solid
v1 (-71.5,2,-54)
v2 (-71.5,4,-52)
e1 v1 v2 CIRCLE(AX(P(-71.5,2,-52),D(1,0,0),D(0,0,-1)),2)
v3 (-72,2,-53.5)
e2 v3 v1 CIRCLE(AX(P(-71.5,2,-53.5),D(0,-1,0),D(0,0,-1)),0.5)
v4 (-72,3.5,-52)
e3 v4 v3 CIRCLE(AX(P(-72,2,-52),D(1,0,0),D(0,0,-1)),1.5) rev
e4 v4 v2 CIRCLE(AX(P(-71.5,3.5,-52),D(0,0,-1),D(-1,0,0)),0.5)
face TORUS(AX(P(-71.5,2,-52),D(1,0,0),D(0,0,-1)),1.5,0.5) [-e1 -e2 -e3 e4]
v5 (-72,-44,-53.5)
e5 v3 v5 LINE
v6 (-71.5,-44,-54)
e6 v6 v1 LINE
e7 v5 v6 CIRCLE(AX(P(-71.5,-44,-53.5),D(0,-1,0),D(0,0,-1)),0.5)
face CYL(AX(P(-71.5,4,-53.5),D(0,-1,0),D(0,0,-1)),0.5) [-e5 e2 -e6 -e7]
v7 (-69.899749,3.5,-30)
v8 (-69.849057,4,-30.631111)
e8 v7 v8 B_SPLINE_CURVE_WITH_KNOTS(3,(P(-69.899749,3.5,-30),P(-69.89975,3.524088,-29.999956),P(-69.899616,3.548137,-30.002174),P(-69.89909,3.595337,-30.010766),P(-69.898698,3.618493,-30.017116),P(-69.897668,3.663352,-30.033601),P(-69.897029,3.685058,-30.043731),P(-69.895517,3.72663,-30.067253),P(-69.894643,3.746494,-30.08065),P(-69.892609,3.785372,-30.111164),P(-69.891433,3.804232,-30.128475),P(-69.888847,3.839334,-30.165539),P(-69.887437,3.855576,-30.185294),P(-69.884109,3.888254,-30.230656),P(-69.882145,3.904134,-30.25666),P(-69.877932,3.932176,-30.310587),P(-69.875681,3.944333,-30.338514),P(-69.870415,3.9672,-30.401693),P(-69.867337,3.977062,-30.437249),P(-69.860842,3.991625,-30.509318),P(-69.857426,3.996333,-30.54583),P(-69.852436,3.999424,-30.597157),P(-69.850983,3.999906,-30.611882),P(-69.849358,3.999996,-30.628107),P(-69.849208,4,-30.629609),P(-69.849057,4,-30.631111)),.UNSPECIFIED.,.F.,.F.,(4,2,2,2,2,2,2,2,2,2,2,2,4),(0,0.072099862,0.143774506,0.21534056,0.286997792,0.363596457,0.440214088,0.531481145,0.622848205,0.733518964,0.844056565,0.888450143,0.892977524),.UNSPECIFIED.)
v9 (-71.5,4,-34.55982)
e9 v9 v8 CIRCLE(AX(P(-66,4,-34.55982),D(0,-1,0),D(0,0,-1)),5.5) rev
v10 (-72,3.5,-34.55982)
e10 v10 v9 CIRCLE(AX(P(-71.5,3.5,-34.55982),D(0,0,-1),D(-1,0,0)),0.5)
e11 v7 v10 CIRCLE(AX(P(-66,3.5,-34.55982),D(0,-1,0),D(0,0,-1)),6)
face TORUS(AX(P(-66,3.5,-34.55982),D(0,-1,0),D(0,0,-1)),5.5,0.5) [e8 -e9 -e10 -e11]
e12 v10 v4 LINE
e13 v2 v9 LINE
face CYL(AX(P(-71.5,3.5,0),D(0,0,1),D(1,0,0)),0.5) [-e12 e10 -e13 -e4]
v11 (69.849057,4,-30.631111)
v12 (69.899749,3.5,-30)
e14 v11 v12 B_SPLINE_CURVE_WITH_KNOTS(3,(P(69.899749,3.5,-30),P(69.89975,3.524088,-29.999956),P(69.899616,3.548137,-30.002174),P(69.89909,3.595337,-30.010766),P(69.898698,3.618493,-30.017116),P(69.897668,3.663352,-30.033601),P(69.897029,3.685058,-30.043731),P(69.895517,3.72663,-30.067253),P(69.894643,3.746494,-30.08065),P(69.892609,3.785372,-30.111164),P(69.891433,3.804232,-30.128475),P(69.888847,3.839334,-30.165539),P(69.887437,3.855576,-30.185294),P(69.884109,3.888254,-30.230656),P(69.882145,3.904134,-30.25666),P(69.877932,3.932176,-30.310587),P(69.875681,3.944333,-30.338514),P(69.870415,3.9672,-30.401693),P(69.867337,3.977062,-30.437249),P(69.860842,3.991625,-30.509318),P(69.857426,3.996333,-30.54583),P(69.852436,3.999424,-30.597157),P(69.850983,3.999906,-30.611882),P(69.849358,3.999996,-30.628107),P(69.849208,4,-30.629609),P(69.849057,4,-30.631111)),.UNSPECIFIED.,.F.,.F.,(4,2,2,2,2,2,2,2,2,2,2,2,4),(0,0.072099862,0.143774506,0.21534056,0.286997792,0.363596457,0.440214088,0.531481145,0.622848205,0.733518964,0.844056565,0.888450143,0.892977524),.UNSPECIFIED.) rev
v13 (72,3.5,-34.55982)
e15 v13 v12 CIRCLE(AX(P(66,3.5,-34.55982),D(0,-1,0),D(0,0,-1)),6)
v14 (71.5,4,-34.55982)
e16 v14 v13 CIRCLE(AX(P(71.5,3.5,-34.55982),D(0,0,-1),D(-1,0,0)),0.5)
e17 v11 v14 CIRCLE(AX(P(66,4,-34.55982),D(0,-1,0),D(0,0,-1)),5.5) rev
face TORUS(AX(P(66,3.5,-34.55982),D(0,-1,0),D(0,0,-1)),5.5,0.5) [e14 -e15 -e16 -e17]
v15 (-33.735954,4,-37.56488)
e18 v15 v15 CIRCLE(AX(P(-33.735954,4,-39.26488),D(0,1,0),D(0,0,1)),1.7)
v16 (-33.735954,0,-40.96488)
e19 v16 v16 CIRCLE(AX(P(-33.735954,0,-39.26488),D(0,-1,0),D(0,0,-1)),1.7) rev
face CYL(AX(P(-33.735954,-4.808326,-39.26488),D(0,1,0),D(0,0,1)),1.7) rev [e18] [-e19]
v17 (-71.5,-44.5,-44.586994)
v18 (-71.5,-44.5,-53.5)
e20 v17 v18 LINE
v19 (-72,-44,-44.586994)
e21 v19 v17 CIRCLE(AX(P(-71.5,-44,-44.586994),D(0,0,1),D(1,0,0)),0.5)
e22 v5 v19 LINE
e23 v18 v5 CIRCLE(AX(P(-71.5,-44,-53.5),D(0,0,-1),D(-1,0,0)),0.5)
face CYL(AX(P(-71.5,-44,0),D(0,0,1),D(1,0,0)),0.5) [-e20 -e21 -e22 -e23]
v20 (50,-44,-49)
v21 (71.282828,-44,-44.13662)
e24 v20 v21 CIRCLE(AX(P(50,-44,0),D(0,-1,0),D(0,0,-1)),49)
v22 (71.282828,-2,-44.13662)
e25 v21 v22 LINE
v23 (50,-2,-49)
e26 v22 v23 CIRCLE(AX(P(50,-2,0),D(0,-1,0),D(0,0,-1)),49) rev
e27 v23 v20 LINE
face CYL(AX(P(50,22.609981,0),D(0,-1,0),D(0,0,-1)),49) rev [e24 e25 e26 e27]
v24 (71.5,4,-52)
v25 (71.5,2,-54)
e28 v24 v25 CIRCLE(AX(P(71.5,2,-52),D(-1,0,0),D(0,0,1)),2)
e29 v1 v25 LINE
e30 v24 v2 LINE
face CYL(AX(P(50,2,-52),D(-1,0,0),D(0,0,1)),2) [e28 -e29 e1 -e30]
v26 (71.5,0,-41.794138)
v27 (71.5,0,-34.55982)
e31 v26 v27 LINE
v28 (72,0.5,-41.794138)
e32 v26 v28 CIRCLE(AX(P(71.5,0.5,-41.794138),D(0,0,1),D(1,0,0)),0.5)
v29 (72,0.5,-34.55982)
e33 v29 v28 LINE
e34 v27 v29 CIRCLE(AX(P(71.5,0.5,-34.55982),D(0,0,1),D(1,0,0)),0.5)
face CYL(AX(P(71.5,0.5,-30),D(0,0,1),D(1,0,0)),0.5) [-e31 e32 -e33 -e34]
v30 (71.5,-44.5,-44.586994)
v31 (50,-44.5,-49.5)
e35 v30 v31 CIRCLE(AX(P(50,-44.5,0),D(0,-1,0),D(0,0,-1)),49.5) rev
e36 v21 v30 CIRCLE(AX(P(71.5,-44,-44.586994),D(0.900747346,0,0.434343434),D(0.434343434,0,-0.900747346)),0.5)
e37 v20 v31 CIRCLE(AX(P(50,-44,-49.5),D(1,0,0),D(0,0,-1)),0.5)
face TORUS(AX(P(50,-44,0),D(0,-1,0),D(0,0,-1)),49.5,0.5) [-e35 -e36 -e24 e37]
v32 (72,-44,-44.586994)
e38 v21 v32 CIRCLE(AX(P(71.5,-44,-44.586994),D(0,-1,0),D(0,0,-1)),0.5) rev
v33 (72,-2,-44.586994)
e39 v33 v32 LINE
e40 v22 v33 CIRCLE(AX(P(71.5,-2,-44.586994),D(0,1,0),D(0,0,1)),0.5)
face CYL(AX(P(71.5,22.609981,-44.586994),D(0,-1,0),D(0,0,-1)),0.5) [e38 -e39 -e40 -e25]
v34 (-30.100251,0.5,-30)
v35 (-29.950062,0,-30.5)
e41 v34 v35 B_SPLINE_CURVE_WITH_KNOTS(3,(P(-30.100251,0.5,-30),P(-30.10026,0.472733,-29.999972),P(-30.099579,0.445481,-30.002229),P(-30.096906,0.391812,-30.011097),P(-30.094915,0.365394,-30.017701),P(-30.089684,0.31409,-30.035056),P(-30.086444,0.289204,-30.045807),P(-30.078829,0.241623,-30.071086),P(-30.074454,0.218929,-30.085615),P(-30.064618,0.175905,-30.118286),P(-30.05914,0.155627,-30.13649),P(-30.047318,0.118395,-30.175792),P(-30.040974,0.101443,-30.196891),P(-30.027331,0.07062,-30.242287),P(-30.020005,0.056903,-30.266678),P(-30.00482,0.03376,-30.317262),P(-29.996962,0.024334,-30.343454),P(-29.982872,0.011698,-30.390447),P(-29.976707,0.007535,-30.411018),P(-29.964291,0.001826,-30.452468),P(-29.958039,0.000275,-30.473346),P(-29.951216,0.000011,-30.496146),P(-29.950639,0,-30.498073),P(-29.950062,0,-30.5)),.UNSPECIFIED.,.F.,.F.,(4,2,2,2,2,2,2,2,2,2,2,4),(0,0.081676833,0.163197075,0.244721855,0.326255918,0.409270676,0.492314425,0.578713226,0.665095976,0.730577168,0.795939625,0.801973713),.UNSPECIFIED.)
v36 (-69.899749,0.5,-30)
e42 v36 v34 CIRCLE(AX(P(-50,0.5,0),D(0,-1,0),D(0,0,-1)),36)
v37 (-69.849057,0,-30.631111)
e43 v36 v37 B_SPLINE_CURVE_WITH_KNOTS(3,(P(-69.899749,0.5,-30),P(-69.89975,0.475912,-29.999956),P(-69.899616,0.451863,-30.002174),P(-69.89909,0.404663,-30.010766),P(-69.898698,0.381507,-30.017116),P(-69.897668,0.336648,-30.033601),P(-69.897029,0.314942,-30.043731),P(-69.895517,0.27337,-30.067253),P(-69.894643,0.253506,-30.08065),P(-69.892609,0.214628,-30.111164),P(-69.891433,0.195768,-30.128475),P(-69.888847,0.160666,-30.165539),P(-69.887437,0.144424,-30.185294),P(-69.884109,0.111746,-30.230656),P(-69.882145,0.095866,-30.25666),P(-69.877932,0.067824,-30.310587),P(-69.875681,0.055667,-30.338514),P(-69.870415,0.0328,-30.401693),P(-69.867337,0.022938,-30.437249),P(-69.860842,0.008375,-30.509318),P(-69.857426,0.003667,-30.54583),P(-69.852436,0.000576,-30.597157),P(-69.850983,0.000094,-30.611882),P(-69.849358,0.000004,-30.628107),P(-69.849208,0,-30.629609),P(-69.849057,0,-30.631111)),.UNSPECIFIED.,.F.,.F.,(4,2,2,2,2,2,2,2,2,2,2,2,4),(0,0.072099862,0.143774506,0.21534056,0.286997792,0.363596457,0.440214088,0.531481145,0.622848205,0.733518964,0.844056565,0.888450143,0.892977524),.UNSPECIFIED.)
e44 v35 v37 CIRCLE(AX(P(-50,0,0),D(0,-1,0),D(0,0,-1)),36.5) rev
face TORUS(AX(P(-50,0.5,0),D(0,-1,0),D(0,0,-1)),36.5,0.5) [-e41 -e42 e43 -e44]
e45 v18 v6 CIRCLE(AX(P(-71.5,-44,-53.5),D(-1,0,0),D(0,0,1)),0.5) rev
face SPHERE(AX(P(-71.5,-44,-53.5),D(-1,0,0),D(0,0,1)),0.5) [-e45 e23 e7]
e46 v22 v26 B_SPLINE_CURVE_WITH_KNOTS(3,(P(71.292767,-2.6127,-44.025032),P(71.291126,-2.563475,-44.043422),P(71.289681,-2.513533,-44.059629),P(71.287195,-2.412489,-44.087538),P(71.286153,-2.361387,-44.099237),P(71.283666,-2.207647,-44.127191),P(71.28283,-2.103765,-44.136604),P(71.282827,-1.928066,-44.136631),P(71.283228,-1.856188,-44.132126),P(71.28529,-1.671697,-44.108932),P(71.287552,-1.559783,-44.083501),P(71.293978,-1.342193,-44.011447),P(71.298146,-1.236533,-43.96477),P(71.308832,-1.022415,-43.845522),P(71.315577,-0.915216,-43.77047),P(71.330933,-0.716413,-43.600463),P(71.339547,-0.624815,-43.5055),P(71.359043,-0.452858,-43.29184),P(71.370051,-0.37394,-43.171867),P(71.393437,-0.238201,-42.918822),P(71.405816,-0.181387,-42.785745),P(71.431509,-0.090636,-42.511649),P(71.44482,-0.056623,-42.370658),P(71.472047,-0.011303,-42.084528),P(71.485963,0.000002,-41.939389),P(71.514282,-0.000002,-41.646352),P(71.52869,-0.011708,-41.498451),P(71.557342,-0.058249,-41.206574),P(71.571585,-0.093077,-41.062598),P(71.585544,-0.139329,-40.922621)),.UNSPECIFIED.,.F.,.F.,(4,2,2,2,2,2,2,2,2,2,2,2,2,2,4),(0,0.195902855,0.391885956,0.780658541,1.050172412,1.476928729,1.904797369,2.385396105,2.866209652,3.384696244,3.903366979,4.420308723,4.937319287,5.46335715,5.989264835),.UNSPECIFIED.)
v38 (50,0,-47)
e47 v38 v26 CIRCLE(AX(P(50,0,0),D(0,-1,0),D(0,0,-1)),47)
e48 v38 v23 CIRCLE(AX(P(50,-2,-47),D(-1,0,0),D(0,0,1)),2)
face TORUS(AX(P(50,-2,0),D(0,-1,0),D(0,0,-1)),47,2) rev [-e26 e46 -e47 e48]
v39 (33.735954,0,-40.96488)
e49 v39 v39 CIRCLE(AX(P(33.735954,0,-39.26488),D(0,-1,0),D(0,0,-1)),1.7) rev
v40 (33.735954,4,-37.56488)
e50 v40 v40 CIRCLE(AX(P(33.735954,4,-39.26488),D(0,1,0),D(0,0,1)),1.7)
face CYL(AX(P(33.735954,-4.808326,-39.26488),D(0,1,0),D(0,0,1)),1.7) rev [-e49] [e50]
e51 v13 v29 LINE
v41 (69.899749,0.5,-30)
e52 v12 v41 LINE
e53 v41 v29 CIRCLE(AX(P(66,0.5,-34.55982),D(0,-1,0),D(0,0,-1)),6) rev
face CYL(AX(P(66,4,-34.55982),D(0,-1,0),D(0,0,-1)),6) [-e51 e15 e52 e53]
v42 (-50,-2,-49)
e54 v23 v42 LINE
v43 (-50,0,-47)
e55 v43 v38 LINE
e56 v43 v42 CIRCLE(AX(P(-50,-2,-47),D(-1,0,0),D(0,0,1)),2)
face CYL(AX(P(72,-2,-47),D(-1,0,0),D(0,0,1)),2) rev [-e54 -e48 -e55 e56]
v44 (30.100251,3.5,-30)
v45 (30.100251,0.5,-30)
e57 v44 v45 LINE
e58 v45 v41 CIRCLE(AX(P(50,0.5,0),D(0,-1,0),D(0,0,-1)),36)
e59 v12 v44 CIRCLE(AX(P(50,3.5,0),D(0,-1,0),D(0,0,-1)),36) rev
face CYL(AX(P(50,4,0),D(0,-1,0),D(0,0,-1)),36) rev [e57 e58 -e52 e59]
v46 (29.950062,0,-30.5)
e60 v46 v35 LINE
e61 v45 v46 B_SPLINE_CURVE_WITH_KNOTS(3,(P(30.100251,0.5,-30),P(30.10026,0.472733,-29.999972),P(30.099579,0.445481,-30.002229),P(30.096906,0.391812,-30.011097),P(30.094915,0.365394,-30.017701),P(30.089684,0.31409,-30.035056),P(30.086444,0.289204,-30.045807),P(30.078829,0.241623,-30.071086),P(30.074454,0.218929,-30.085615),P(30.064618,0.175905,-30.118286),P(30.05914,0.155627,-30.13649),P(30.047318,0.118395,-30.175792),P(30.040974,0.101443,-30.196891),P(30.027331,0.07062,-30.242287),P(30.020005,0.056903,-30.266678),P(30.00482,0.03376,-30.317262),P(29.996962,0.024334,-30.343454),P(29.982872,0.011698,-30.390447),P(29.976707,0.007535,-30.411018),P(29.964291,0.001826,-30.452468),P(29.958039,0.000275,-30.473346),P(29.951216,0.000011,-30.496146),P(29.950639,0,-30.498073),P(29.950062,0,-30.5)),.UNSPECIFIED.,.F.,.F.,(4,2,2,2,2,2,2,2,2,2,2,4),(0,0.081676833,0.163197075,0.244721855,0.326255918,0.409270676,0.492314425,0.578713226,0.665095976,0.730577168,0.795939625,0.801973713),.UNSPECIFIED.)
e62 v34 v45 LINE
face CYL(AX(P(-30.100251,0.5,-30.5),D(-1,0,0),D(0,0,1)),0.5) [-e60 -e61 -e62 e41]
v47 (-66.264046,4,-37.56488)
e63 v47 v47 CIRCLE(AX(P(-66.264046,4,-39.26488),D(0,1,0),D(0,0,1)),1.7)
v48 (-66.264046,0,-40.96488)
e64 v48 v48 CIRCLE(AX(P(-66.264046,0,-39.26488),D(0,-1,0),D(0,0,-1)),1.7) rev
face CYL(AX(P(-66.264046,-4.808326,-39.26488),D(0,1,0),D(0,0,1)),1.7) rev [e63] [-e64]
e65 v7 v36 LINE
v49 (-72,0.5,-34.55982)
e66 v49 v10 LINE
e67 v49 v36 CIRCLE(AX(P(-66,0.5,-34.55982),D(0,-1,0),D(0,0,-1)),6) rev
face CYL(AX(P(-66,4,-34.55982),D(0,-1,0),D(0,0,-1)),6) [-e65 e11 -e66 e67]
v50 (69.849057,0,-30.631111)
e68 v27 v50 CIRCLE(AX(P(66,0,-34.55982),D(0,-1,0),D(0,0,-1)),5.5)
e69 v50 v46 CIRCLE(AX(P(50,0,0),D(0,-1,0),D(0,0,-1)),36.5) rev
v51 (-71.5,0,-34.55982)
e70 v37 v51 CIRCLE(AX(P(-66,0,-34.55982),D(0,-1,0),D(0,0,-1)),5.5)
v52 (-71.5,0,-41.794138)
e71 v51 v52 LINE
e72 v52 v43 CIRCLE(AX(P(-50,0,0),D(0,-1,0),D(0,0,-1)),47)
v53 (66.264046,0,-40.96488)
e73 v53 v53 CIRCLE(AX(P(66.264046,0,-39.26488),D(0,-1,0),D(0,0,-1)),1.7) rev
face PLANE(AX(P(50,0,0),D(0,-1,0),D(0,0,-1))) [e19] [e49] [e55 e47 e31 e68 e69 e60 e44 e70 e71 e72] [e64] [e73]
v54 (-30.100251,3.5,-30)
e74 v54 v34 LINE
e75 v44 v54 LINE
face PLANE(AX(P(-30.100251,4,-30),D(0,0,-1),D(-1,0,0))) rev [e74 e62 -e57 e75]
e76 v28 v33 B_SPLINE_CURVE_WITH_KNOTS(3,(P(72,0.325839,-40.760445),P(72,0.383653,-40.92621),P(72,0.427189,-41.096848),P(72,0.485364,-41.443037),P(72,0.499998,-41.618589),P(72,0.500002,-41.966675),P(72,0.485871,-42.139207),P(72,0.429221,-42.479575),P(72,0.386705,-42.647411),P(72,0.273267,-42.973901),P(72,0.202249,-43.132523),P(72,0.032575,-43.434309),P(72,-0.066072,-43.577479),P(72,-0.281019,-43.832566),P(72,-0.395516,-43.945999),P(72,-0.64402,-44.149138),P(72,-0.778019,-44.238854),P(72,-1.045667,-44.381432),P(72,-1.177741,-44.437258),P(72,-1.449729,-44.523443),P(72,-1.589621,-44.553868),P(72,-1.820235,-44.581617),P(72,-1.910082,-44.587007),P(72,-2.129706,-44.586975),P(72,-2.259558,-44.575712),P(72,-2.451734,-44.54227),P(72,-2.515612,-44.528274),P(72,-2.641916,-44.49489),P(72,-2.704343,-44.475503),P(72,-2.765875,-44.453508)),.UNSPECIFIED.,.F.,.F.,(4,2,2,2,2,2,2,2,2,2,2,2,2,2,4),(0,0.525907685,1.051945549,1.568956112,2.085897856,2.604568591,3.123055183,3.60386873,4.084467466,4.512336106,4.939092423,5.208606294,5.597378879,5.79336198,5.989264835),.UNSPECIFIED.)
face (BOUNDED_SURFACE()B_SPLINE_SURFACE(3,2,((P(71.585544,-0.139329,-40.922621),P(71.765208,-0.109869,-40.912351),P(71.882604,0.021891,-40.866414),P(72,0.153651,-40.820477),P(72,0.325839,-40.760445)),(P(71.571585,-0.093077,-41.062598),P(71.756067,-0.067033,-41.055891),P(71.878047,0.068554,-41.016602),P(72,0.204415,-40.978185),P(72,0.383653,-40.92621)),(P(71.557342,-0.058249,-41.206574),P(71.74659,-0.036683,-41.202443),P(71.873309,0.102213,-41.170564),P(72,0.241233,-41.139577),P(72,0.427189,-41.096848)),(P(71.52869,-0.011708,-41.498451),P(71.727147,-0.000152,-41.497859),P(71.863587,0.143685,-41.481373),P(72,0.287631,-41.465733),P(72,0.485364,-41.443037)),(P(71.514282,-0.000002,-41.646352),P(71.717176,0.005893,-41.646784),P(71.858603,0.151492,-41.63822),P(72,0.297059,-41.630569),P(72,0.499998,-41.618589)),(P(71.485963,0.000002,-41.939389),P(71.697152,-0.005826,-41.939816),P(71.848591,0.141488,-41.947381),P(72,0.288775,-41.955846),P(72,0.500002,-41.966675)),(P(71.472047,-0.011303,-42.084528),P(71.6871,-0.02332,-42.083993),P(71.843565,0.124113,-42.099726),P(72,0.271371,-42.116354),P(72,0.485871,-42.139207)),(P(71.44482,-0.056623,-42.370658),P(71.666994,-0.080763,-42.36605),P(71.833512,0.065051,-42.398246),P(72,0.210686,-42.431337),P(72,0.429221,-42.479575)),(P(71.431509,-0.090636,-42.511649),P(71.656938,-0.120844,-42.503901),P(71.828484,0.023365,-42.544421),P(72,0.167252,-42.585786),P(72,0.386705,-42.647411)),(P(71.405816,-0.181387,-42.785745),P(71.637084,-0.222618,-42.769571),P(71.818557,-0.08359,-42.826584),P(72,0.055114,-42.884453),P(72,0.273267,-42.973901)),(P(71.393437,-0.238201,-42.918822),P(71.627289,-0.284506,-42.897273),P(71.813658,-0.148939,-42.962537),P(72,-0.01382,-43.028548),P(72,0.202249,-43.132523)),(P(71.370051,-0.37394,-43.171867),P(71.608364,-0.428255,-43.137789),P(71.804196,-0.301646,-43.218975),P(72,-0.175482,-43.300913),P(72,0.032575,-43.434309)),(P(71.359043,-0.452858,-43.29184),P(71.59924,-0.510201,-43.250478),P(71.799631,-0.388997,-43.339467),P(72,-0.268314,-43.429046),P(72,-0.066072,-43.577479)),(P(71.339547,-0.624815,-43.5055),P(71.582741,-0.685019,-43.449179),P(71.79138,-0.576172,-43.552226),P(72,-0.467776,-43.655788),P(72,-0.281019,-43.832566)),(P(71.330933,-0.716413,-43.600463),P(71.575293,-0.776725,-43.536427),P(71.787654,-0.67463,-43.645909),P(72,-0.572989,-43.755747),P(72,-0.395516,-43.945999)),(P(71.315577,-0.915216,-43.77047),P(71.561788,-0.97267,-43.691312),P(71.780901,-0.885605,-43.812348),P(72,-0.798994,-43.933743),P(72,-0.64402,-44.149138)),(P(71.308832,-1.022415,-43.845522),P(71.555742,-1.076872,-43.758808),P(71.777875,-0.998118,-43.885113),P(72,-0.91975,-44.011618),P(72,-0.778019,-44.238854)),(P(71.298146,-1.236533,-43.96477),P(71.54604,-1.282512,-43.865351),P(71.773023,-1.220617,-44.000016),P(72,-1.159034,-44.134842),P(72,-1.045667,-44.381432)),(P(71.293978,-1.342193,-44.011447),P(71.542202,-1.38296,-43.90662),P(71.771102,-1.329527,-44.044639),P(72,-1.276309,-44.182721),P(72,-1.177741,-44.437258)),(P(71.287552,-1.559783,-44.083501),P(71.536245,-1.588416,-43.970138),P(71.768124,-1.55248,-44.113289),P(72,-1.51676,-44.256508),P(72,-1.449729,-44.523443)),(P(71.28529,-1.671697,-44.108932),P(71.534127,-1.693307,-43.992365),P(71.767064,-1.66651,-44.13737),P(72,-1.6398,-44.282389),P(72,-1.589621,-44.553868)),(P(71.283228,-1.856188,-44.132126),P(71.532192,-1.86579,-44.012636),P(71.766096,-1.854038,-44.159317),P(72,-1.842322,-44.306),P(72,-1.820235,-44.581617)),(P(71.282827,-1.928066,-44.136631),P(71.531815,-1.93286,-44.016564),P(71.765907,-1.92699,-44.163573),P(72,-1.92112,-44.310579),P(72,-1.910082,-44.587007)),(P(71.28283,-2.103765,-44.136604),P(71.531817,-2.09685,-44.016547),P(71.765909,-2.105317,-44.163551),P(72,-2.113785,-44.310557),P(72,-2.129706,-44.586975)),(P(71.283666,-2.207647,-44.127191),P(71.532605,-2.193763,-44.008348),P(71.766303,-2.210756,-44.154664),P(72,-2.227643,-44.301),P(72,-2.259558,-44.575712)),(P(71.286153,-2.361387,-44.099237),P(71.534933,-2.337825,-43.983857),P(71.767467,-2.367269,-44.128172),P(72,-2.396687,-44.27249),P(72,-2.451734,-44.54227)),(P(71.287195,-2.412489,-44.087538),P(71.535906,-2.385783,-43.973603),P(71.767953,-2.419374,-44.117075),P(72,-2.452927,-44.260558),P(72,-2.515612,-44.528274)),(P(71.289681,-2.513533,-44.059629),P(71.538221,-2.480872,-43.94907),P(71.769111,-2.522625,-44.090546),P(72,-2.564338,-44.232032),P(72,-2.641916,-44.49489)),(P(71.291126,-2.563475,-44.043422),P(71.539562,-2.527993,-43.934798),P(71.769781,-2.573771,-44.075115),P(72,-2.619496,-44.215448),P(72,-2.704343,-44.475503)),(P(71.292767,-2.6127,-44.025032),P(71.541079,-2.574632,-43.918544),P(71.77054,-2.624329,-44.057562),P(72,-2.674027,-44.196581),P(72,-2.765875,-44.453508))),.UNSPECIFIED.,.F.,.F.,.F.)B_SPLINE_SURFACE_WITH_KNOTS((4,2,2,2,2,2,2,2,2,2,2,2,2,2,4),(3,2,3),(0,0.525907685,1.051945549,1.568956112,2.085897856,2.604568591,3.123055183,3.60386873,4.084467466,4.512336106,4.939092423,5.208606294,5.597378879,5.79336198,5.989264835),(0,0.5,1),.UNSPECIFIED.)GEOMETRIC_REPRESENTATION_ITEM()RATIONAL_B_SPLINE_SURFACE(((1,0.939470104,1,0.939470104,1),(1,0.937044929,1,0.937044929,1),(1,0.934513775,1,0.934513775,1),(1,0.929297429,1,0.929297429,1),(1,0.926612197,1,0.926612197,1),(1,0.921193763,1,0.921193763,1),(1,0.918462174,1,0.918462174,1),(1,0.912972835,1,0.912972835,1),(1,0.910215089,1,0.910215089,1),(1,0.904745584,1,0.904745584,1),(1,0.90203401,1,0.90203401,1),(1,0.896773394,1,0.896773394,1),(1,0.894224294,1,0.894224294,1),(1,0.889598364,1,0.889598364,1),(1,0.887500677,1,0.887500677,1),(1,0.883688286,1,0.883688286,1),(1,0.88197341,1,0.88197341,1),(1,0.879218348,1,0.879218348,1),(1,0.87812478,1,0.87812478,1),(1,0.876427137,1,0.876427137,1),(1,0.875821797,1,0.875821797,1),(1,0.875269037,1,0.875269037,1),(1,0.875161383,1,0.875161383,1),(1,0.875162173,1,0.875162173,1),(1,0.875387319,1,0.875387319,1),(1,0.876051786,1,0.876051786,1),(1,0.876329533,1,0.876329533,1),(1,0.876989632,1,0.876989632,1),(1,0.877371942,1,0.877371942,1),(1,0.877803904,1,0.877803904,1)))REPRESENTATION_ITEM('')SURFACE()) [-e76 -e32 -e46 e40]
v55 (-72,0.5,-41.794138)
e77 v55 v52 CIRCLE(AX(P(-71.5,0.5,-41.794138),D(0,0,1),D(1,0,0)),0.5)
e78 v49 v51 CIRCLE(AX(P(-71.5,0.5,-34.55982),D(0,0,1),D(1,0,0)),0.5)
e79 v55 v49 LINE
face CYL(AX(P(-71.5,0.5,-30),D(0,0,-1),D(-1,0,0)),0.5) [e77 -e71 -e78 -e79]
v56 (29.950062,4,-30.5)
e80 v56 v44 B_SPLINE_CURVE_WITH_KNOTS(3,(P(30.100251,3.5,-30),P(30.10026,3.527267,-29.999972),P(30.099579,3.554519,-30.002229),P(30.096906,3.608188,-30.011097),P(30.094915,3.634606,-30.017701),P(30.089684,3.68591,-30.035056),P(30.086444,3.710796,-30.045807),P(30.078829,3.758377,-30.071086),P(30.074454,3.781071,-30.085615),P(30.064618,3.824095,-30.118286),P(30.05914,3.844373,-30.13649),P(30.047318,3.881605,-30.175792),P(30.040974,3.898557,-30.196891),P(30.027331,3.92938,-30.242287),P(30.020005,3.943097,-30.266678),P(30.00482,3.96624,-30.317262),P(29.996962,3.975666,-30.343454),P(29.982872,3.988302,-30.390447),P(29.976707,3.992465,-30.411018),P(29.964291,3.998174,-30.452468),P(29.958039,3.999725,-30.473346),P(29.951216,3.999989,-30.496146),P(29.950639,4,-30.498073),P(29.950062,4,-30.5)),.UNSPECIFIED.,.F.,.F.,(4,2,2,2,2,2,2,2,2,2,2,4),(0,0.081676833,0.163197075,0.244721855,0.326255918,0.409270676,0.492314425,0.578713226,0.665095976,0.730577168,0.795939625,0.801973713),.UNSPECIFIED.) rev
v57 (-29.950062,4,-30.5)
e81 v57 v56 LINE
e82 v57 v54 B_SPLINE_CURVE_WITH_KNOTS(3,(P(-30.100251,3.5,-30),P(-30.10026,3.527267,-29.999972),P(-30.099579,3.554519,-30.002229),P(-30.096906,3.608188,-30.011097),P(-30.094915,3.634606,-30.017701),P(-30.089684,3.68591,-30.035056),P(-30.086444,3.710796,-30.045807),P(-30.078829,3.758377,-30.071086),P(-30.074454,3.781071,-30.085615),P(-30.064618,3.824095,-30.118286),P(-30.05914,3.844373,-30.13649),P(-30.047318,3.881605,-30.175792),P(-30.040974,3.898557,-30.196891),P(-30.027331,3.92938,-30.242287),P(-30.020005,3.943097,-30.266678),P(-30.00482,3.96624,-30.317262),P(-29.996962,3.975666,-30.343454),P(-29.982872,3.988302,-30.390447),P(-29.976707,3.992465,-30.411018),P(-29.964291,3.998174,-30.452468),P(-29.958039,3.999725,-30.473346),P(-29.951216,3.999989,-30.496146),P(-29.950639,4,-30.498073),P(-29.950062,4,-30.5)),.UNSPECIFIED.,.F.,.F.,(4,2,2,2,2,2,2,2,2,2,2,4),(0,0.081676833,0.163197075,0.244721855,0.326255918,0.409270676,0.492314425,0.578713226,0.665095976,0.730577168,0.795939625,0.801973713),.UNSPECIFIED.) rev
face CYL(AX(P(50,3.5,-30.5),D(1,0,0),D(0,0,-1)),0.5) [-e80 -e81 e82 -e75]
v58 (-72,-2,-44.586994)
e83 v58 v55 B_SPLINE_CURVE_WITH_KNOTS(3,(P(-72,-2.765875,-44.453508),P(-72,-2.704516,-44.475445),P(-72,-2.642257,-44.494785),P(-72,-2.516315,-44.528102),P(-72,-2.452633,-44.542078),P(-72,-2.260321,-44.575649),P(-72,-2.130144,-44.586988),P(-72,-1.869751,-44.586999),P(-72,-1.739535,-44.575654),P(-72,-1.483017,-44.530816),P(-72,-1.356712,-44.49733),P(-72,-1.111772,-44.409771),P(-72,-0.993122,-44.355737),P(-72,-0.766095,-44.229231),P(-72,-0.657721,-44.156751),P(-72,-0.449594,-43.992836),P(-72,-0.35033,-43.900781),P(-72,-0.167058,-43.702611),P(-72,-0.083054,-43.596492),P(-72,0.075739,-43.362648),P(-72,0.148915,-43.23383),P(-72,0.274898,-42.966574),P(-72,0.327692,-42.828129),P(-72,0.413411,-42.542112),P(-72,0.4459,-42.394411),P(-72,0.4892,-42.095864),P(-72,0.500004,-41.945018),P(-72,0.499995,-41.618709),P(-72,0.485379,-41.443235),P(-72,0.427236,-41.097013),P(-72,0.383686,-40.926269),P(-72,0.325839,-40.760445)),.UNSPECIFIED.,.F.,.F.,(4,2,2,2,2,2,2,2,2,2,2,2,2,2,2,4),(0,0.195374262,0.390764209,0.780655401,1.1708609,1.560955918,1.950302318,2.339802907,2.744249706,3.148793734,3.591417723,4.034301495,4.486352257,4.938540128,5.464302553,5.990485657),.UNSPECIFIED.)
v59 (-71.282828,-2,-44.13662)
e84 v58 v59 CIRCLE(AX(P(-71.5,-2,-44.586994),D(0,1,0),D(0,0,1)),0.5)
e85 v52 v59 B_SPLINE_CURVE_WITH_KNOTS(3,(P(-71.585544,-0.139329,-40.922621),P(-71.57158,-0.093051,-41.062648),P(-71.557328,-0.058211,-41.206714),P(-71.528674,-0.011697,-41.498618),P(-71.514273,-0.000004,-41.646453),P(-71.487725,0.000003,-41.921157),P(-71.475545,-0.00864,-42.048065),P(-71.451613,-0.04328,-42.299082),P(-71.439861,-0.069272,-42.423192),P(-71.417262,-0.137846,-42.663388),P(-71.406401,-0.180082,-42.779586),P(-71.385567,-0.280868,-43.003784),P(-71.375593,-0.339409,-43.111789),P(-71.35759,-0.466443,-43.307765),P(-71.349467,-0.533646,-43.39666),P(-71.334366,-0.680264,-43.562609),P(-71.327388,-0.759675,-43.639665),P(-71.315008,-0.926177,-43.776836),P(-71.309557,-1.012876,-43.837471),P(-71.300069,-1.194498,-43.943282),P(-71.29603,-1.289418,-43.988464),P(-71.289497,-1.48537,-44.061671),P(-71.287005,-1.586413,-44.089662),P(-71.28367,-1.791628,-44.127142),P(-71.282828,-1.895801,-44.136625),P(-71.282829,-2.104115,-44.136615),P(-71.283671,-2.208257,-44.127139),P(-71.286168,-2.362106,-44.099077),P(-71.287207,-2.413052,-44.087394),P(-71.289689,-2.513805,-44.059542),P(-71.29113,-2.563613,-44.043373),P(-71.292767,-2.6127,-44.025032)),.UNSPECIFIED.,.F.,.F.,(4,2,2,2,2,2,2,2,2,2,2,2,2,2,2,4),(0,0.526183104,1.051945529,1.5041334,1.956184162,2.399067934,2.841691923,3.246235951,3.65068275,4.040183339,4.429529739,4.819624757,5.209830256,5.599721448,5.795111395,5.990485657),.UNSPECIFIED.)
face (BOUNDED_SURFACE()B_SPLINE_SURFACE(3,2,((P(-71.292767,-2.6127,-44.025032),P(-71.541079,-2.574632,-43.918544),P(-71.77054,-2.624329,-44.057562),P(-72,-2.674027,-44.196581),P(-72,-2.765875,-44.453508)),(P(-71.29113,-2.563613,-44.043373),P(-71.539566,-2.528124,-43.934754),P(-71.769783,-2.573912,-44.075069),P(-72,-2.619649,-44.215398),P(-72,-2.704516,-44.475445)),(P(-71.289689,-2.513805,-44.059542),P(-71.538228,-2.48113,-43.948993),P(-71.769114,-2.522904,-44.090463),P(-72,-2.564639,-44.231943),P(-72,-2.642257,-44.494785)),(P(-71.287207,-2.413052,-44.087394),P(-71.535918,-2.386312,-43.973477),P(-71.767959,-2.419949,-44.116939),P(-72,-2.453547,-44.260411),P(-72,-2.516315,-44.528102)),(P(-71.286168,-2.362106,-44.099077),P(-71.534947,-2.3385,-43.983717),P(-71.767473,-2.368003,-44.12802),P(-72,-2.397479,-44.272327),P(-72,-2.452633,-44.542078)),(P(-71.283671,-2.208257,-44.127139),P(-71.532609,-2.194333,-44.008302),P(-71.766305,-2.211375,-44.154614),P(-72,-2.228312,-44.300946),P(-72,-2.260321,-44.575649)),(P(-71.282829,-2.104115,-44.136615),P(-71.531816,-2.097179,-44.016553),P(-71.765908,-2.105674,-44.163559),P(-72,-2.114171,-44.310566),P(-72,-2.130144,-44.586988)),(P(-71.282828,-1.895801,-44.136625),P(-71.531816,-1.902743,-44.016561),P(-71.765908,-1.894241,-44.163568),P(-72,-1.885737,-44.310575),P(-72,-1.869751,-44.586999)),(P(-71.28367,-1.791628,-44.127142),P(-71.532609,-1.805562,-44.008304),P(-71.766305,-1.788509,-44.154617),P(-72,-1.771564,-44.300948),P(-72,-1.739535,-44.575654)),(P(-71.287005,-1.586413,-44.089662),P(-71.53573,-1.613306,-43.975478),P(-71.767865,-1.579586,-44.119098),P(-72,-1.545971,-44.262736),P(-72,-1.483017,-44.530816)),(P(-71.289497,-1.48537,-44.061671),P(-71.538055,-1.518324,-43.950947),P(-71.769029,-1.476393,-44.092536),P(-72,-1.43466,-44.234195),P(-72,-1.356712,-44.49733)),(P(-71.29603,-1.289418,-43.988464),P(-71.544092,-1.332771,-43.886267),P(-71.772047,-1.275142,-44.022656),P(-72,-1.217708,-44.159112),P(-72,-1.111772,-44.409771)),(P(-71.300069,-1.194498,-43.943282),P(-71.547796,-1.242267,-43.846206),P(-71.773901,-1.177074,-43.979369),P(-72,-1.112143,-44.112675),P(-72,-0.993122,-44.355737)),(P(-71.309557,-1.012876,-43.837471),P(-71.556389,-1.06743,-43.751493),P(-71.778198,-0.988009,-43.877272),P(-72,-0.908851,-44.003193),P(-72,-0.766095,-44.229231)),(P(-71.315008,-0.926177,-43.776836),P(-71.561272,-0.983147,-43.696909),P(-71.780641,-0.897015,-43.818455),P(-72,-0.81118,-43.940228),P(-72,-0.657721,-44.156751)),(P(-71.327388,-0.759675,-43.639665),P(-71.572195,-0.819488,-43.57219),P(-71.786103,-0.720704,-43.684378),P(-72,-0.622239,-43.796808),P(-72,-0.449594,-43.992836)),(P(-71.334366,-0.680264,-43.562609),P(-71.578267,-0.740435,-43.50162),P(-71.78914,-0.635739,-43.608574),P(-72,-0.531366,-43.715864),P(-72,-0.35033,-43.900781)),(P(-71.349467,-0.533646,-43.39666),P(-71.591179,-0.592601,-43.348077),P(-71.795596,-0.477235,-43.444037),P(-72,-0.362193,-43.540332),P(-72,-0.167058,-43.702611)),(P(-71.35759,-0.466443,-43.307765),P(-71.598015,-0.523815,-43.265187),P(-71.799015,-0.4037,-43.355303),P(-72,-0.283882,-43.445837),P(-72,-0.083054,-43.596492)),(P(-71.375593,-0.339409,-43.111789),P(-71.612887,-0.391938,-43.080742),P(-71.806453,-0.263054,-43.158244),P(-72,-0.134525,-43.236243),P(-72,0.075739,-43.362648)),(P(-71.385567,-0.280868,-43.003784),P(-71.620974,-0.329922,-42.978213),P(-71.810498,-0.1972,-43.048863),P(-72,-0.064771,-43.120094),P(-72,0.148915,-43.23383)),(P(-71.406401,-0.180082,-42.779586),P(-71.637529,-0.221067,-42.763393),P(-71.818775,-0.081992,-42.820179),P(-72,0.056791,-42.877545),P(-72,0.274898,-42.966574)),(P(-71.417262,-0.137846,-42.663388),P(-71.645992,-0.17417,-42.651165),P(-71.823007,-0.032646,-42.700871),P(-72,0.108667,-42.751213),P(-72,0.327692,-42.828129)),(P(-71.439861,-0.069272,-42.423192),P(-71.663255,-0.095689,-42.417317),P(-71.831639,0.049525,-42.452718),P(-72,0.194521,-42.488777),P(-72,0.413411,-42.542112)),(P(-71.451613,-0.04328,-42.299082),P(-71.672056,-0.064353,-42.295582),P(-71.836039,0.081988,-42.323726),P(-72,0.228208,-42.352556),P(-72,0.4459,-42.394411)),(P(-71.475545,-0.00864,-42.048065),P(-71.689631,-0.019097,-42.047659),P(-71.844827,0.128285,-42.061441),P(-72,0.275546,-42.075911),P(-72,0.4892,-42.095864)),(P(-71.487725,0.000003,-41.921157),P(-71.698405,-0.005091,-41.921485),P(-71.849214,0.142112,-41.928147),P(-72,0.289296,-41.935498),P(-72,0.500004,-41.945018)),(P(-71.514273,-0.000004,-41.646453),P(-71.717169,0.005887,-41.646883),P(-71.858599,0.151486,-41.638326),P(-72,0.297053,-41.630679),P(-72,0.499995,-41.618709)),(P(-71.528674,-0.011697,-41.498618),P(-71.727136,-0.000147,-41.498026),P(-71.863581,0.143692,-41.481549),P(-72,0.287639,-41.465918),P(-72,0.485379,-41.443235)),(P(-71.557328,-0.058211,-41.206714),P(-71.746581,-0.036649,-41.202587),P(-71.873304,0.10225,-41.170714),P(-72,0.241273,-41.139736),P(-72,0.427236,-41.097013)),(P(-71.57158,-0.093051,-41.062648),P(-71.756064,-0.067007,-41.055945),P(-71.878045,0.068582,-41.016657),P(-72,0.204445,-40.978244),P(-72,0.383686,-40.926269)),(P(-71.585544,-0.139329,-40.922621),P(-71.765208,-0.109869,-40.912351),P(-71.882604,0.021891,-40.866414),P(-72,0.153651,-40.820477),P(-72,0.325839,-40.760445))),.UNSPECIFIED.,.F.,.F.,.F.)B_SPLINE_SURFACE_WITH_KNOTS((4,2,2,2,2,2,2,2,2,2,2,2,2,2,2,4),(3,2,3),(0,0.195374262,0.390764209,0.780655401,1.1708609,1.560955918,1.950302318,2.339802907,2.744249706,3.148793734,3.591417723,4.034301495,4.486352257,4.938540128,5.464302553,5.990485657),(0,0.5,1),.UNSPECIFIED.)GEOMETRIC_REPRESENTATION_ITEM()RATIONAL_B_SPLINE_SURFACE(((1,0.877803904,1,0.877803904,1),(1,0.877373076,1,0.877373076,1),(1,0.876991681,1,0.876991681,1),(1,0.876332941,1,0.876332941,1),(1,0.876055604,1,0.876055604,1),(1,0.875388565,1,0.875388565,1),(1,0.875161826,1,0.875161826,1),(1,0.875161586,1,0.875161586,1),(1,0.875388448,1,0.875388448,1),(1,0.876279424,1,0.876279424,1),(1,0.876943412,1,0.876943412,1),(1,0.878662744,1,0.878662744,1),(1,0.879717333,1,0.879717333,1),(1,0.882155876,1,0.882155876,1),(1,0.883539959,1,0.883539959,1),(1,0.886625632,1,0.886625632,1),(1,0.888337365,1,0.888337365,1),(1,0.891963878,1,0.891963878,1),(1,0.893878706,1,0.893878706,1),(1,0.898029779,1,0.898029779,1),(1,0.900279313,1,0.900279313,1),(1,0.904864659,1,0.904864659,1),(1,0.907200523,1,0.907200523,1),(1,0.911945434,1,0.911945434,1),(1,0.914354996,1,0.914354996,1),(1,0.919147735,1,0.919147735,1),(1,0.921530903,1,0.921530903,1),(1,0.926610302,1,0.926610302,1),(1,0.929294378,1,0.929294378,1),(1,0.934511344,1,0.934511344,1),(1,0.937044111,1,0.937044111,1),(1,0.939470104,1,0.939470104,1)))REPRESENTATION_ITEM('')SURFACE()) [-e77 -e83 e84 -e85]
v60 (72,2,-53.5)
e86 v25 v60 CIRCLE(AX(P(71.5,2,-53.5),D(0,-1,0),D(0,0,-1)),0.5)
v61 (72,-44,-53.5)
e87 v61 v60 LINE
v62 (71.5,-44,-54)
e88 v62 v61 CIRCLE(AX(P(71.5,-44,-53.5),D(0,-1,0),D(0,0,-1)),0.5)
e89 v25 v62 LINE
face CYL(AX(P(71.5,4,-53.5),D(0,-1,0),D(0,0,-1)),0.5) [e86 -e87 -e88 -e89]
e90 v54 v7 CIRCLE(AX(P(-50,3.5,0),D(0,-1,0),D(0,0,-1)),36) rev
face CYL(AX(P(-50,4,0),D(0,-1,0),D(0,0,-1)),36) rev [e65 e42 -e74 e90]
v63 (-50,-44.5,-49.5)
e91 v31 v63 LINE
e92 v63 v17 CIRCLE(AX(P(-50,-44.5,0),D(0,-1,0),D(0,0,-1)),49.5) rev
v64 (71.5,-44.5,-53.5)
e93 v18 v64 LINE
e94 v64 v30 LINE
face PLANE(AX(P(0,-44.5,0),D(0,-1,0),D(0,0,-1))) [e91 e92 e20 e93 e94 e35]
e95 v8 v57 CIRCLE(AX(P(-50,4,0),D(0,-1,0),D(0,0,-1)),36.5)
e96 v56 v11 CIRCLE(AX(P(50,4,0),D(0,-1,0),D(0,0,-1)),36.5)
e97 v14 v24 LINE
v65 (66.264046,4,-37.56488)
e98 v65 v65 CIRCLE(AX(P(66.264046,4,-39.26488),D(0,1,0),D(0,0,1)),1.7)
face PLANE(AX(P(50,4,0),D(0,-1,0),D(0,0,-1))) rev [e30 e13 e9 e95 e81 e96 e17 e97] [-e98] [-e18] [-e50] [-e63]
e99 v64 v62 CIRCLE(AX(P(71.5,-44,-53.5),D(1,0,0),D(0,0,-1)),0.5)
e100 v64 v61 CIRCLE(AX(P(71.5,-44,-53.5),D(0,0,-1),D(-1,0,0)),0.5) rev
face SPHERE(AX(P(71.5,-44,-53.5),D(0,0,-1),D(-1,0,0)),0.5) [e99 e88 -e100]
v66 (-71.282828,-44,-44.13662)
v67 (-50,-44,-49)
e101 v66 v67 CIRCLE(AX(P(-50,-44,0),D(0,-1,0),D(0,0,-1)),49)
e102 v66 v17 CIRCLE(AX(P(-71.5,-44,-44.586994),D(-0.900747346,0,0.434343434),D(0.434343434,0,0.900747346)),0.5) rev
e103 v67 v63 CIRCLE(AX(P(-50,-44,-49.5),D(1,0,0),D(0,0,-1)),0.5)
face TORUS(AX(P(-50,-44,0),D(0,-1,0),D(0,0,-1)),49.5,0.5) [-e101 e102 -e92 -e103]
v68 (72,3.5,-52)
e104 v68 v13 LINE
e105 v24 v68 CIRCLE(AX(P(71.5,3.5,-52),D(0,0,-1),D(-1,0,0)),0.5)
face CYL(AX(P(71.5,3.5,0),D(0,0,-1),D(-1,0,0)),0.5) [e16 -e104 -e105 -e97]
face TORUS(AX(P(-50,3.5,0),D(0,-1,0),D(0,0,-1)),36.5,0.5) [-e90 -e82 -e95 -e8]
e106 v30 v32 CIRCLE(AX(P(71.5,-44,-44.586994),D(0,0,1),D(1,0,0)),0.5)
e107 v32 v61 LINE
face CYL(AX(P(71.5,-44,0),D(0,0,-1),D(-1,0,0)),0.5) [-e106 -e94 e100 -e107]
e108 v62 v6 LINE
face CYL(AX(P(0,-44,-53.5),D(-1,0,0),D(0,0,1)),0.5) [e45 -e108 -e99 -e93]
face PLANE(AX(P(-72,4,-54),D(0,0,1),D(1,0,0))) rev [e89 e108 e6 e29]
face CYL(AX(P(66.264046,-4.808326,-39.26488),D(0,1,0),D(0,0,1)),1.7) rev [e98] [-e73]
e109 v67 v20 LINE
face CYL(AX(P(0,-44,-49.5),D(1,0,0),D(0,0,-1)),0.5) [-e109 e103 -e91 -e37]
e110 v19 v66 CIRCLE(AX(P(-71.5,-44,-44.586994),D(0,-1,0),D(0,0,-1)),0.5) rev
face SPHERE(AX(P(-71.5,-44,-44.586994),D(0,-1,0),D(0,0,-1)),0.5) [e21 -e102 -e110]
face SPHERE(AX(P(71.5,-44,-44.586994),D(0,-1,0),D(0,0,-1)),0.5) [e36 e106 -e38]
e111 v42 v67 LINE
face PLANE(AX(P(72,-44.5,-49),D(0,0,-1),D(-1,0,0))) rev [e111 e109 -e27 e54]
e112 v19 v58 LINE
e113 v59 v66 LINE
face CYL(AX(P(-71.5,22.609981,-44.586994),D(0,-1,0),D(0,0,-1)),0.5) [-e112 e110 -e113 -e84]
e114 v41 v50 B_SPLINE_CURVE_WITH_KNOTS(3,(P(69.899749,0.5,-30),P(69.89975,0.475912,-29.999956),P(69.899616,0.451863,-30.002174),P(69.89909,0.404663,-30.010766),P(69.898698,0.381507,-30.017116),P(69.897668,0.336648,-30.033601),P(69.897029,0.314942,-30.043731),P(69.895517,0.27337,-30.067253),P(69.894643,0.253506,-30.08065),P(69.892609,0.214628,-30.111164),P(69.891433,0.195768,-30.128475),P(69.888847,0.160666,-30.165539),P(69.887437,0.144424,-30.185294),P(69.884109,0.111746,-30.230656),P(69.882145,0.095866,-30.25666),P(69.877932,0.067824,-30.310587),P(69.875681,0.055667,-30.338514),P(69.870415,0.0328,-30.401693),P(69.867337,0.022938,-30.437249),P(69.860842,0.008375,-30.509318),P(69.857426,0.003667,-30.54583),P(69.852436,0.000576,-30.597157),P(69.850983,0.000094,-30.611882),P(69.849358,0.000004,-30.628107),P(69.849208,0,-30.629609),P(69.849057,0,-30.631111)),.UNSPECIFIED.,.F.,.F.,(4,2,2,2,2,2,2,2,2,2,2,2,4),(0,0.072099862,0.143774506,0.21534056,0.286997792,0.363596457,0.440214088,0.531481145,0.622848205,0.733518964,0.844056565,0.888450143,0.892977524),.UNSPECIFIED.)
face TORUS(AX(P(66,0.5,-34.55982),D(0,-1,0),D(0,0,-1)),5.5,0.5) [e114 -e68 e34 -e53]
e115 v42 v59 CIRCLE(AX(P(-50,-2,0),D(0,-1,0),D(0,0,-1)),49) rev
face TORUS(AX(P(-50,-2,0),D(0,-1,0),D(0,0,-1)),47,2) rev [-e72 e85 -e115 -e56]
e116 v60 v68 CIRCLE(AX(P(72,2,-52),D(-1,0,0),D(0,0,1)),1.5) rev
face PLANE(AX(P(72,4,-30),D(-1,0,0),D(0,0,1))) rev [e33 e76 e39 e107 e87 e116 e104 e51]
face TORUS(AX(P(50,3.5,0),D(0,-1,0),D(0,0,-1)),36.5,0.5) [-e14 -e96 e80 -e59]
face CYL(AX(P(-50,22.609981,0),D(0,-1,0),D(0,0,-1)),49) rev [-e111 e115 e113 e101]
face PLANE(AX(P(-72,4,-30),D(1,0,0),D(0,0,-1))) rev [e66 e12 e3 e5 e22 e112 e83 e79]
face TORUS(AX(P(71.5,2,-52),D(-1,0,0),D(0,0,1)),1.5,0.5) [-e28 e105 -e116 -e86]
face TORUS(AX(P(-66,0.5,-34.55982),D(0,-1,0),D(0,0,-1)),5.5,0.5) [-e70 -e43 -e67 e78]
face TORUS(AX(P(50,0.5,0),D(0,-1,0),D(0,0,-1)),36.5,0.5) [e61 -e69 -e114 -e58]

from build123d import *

# Parameters (mm, degrees)
BOSS_EXTRUDE1_DEPTH = 4
SKETCH3_W           = 144
SKETCH3_H           = 5
BOSS_EXTRUDE2_DEPTH = 44.5
SKETCH5_R           = 1.7
CUT_EXTRUDE1_DEPTH  = 4
BOSS_EXTRUDE3_DEPTH = 44.5
FILLET1_R           = 2
FILLET2_R           = 6
FILLET3_R           = 0.5


with BuildPart() as part:
    # Sketch2 → Boss-Extrude1 (new body)
    with BuildSketch(Plane(origin=(0, 0, 0), x_dir=(1, 0, 0), z_dir=(0, 1, 0))):
        with BuildLine():
            Line((72, 30), (72, 54))
            Line((72, 54), (-72, 54))
            Line((-72, 54), (-72, 30))
            Line((-72, 30), (-69.899748742, 30))
            ThreePointArc((-69.899748742, 30), (-50, 36), (-30.100251258, 30))
            Line((-30.100251258, 30), (30.100251258, 30))
            ThreePointArc((30.100251258, 30), (50, 36), (69.899748742, 30))
            Line((69.899748742, 30), (72, 30))
        make_face()
    extrude(amount=BOSS_EXTRUDE1_DEPTH)

    # Sketch3 → Boss-Extrude2 (add)
    with BuildSketch(Plane.XZ):
        with Locations((0, -51.5)):
            Rectangle(SKETCH3_W, SKETCH3_H)
    extrude(amount=BOSS_EXTRUDE2_DEPTH)

    # Sketch5 → Cut-Extrude1 (cut)
    with BuildSketch(Plane(origin=(0, 4, 0), x_dir=(1, 0, 0), z_dir=(0, 1, 0))):
        with Locations(Location((-66.264045876, 39.264880132, 0), (0, 0, 270))):
            Circle(SKETCH5_R)
        with Locations(Location((-33.735954124, 39.264880132, 0), (0, 0, 270))):
            Circle(SKETCH5_R)
        with Locations(Location((33.735954124, 39.264880132, 0), (0, 0, 270))):
            Circle(SKETCH5_R)
        with Locations(Location((66.264045876, 39.264880132, 0), (0, 0, 270))):
            Circle(SKETCH5_R)
    extrude(amount=-CUT_EXTRUDE1_DEPTH, mode=Mode.SUBTRACT)

    # Sketch6 → Boss-Extrude3 (add)
    with BuildSketch(Plane.XZ.offset(44.5)):
        with BuildLine():
            Line((72, -49), (72, -43.783558558))
            ThreePointArc((72, -43.783558558), (61.304990727, -47.678057686), (50, -49))
            Line((50, -49), (72, -49))
        make_face()
        with BuildLine():
            Line((-72, -49), (-50, -49))
            ThreePointArc((-50, -49), (-61.304990727, -47.678057686), (-72, -43.783558558))
            Line((-72, -43.783558558), (-72, -49))
        make_face()
    extrude(amount=-BOSS_EXTRUDE3_DEPTH)

    # Fillet1
    fillet1_edges = [part.edges().sort_by_distance(p)[0] for p in [
        (0, 4, -54),
        (0, 0, -49),
        (61.304990727, 0, -47.678057686),
        (-61.304990727, 0, -47.678057686),
    ]]
    fillet(fillet1_edges, radius=FILLET1_R)

    # Fillet2
    # the kernel refuses this fillet: 6 mm, written as the material it takes off along each edge
    with BuildSketch(Plane(origin=(-72, -11.399550361, -30), x_dir=(0, 0, -1), z_dir=(0, 1, 0))) as fillet2_piece_1:
        with BuildLine():
            CenterArc((4.559820144, -6), FILLET2_R, 90, 49.461555346)
            Line((0, -2.100251258), (-0.091196403, -2.022256283))
            ThreePointArc((-0.091196403, -2.022256283), (-0.12, -1.050125629), (-0.12, 0))
            Line((-0.12, 0), (0, 0.12))
            Line((0, 0.12), (4.559820144, 0.12))
            Line((4.559820144, 0.12), (4.559820144, 0))
        make_face()
    extrude(amount=26.799100721, mode=Mode.SUBTRACT)
    with BuildSketch(Plane(origin=(72, -11.399550361, -30), x_dir=(0, 0, -1), z_dir=(0, 1, 0))) as fillet2_piece_2:
        with BuildLine():
            CenterArc((4.559820144, 6), FILLET2_R, 220.538444654, 49.461555346)
            Line((0, 2.100251258), (-0.091196403, 2.022256283))
            ThreePointArc((-0.091196403, 2.022256283), (-0.12, 1.050125629), (-0.12, 0))
            Line((-0.12, 0), (0, -0.12))
            Line((0, -0.12), (4.559820144, -0.12))
            Line((4.559820144, -0.12), (4.559820144, 0))
        make_face()
    extrude(amount=26.799100721, mode=Mode.SUBTRACT)

    # Fillet3
    fillet3_edges = [part.edges().sort_by_distance(p)[0] for p in [
        (-50, 0, -36),
        (-50, 4, -36),
        (0, 4, -30),
        (50, 4, -36),
        (72, -44.5, -48.891779279),
        (-72, -44.5, -48.891779279),
        (0, -44.5, -54),
        (0, -44.5, -49),
        (61.304990727, -44.5, -47.678057686),
        (-61.304990727, -44.5, -47.678057686),
        (-72, 0, -38.046469729),
        (72, -23.25, -43.783558558),
        (-72, -23.25, -43.783558558),
        (-72, 4, -43.279910072),
        (-72, -21.25, -54),
        (-72, 3.414213562, -53.414213562),
        (72, -21.25, -54),
        (72, 3.414213562, -53.414213562),
        (72, -0.543612491, -43.078170154),
        (-72, -0.543612491, -43.078170154),
        (50, 0, -36),
        (72, 0, -38.046469729),
        (71.44970148, 0, -32.049689914),
        (-71.44970148, 0, -32.049689914),
        (0, 0, -30),
        (72, 4, -43.279910072),
        (71.44970148, 4, -32.049689914),
        (-71.44970148, 4, -32.049689914),
    ]]
    fillet(fillet3_edges, radius=FILLET3_R)


solid = part.part
